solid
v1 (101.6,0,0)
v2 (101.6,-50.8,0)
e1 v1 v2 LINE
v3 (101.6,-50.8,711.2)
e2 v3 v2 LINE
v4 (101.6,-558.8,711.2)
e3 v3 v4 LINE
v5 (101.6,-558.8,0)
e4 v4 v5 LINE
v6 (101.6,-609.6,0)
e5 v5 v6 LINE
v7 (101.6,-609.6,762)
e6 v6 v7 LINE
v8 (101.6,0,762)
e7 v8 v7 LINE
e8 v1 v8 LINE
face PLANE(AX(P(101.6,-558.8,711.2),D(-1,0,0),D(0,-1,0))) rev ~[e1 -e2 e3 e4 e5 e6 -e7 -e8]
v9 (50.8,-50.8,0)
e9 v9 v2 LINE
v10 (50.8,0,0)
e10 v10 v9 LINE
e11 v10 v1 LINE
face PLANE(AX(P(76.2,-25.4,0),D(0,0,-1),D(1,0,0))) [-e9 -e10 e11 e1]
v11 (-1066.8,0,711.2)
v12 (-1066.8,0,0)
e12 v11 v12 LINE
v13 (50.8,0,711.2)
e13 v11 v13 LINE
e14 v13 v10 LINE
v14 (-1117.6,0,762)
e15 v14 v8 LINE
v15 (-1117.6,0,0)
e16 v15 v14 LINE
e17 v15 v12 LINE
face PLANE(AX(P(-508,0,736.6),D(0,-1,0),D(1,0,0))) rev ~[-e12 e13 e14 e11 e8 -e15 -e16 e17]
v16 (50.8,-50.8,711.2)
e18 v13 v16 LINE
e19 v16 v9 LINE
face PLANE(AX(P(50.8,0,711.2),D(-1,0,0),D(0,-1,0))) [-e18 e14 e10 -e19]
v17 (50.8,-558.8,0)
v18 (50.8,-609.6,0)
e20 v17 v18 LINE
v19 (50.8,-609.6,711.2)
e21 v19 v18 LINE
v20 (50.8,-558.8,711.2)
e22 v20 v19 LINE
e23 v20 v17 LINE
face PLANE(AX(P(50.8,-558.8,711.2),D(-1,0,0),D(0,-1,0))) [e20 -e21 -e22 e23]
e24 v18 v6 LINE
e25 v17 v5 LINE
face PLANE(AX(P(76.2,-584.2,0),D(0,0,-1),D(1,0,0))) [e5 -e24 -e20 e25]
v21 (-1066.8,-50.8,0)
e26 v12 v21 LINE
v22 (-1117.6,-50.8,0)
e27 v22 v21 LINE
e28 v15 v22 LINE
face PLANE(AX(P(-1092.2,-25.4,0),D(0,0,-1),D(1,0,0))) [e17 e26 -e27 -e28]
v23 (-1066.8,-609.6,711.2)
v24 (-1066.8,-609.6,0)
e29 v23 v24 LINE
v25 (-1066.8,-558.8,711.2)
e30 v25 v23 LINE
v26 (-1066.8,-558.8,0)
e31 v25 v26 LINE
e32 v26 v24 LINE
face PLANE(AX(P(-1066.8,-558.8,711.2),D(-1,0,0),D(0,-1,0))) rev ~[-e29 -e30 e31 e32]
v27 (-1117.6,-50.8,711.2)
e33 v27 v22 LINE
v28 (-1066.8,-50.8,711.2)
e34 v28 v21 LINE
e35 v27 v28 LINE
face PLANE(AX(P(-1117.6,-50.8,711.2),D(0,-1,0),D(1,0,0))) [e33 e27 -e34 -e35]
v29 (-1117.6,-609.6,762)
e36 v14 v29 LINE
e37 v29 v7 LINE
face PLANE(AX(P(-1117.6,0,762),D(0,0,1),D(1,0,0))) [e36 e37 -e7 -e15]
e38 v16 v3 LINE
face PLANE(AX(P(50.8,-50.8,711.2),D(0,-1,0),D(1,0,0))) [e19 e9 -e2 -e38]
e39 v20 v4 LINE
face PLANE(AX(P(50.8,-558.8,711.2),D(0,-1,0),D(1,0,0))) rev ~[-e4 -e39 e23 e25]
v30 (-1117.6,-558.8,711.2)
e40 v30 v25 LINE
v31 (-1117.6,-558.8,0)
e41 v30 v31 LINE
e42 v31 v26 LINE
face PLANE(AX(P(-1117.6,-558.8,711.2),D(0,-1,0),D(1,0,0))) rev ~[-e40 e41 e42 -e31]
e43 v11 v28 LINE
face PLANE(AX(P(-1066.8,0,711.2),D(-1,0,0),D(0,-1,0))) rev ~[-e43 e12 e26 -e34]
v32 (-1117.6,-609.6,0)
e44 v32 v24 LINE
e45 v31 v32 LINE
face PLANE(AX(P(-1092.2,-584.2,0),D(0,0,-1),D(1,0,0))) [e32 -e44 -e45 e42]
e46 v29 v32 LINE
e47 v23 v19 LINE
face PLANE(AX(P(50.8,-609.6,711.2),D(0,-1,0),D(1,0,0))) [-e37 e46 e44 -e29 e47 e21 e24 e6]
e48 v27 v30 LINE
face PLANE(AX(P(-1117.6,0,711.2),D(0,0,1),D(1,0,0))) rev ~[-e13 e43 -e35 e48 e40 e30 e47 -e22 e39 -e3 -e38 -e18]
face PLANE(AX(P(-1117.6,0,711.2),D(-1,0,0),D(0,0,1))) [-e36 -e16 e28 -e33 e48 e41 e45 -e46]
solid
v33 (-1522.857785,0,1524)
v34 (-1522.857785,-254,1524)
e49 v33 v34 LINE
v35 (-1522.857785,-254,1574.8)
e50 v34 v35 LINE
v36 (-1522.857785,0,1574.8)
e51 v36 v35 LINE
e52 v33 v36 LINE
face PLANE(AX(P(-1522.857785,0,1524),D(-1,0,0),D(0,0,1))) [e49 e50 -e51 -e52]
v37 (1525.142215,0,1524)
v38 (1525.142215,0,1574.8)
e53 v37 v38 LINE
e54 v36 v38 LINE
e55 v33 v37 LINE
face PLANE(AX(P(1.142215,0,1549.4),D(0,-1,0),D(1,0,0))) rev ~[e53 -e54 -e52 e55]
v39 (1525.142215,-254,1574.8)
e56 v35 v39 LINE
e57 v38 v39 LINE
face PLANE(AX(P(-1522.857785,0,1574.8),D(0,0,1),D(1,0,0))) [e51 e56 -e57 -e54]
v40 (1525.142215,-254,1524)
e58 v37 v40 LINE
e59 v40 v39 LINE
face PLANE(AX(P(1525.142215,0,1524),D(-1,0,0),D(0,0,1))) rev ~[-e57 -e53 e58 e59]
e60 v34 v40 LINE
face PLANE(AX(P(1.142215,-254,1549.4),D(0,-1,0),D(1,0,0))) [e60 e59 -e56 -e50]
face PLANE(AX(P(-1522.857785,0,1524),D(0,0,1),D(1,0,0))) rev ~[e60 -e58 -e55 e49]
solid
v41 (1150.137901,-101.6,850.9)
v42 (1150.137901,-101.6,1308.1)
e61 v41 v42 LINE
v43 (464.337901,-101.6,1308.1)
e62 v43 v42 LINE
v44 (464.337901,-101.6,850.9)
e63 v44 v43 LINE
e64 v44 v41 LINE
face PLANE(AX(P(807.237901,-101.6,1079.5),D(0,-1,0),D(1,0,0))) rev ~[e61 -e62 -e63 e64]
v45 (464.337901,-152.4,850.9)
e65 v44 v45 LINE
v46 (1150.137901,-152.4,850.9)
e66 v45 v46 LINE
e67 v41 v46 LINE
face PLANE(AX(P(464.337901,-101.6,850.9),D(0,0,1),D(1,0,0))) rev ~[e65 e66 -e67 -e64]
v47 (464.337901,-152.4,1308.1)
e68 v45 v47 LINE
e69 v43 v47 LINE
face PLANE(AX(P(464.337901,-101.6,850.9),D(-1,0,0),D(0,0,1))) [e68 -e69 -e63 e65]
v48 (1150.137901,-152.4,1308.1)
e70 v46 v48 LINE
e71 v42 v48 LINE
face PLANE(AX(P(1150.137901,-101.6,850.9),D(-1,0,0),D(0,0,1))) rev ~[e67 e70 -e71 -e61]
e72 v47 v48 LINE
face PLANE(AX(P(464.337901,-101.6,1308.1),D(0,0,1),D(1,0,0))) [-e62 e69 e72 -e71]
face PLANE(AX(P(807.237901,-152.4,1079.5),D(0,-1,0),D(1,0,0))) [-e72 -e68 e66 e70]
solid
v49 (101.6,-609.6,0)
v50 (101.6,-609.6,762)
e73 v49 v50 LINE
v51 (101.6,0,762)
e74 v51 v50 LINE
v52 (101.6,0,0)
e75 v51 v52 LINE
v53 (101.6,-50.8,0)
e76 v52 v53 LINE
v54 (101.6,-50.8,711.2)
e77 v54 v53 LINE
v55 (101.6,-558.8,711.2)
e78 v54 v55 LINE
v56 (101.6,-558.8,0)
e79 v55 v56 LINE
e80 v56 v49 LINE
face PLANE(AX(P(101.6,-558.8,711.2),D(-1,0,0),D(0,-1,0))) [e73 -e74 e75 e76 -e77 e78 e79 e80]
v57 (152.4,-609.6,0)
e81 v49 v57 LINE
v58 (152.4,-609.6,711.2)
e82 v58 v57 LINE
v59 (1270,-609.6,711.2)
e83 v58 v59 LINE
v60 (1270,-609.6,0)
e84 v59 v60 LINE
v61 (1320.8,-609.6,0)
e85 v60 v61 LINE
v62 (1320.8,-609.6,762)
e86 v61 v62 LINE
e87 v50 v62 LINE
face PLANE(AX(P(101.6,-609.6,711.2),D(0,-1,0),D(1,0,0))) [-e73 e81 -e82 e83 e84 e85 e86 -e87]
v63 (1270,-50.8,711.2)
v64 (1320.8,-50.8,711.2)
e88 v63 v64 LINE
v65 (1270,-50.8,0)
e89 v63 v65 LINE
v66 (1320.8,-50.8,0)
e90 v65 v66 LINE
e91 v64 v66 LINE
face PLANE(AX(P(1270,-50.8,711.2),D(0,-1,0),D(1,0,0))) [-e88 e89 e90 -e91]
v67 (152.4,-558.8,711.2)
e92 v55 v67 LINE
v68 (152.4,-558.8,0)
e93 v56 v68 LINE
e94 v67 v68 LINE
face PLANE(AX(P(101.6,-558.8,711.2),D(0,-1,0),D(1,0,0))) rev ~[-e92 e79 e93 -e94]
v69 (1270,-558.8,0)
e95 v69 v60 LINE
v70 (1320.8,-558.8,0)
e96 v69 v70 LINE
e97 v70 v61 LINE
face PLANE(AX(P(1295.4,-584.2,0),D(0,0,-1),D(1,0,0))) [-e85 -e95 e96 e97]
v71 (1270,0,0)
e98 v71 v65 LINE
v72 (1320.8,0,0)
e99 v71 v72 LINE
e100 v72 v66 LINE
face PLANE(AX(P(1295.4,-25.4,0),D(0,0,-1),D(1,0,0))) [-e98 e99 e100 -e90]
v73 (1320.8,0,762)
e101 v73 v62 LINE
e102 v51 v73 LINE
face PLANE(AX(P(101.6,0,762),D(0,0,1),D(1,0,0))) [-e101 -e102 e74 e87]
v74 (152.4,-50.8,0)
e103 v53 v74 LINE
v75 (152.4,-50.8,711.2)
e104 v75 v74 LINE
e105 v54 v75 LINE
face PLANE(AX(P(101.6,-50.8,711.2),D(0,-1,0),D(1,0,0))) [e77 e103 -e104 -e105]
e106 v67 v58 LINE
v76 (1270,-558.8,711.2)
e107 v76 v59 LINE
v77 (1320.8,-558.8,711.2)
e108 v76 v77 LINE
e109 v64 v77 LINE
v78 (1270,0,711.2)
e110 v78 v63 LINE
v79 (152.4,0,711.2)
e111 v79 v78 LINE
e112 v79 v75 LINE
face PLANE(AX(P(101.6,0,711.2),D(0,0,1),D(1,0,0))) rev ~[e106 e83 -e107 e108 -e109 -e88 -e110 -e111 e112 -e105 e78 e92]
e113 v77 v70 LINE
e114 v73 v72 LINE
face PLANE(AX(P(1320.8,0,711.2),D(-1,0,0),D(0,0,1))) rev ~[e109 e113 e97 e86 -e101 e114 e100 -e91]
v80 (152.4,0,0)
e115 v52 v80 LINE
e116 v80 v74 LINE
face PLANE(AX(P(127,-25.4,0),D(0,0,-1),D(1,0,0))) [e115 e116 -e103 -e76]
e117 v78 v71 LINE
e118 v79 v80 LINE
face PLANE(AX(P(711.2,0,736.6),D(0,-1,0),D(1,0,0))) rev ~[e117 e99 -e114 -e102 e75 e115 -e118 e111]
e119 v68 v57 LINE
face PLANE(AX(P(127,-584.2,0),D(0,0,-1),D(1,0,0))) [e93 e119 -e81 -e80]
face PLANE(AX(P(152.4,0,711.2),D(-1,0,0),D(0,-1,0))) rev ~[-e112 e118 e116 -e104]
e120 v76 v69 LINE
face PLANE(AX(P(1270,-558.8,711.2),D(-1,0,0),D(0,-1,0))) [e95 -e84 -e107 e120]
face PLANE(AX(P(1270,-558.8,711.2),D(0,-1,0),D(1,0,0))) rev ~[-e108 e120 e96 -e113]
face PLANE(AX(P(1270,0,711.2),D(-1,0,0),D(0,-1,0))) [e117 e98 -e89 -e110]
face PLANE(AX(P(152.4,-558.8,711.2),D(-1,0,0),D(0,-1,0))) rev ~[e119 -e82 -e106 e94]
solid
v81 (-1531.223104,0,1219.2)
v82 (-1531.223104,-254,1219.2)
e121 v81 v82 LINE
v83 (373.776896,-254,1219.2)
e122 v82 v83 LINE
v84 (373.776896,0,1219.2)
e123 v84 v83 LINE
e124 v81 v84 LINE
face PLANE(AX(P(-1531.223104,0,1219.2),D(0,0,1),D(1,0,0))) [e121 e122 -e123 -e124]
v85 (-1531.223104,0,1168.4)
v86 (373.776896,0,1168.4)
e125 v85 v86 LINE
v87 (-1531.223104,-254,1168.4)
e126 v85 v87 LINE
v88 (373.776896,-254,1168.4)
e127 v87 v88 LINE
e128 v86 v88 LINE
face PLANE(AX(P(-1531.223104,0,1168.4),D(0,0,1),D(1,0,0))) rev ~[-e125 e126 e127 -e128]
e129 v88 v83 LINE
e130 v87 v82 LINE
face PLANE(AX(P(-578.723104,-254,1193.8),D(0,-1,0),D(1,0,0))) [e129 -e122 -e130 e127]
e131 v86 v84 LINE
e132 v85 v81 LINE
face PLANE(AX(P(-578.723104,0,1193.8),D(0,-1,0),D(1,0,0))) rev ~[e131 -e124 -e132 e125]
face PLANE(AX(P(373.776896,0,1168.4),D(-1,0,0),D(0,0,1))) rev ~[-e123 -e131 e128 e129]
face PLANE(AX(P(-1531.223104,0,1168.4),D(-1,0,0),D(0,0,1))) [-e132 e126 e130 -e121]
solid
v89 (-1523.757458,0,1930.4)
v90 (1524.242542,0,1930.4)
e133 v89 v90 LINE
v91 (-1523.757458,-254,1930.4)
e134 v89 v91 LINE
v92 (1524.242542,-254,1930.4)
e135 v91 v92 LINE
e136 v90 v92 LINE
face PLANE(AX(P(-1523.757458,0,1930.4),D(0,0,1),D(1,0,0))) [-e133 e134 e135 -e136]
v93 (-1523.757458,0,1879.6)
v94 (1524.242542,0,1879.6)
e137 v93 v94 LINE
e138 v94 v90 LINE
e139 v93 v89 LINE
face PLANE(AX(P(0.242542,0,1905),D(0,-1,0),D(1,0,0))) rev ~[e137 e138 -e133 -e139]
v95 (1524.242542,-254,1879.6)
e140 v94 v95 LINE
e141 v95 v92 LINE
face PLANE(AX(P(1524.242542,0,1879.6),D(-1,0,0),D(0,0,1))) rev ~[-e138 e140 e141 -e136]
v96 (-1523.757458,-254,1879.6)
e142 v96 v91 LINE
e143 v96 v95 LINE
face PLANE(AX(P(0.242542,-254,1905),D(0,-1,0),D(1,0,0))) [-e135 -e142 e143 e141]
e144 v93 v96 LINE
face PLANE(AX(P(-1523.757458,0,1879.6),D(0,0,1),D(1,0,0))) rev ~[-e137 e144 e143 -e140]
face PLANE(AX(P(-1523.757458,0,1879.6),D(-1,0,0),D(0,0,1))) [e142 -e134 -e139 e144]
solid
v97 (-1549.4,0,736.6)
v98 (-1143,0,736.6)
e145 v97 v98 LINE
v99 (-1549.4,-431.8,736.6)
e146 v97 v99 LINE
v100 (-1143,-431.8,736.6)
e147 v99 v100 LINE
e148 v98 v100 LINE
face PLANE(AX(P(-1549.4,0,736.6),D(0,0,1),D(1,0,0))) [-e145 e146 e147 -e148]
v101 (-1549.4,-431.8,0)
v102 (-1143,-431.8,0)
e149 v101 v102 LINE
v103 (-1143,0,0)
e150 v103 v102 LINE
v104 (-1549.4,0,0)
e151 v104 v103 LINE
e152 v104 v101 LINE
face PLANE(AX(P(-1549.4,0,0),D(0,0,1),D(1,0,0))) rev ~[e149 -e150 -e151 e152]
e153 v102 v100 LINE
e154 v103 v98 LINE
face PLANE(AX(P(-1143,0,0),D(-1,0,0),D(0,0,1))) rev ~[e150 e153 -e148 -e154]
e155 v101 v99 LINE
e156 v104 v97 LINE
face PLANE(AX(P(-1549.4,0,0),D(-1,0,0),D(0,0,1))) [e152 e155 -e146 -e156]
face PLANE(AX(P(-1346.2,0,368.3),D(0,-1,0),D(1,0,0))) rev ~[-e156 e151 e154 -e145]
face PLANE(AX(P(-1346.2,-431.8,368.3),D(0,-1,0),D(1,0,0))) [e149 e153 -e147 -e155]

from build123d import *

# Parameters (mm, degrees)
F0_W     = 3048
F0_H     = 50.8
F1_DEPTH = 254
F0_W_2   = 1905
F0_W_3   = 1219.2
F2_DEPTH = 609.6
F3_START = 101.6
F0_W_4   = 685.8
F0_H_2   = 457.2
F3_DEPTH = 50.8
F4_DEPTH = 609.6
F5_W     = 50.8
F5_H     = 50.8
F6_DEPTH = 711.2
F7_DEPTH = 711.2
F0_W_5   = 406.4
F0_H_3   = 736.6
F8_DEPTH = 431.8


with BuildPart() as f1:
    # F0 (on Front) → F1 (new body)
    with BuildSketch(Plane.XZ):
        with Locations((0.2425422668, 1905)):
            Rectangle(F0_W, F0_H)
    extrude(amount=F1_DEPTH)


with BuildPart() as f1b:
    # F0 (on Front) → F1, piece 2 (new body)
    with BuildSketch(Plane.XZ):
        with Locations((1.1422147751, 1549.4)):
            Rectangle(F0_W, F0_H)
    extrude(amount=F1_DEPTH)


with BuildPart() as f1c:
    # F0 (on Front) → F1, piece 3 (new body)
    with BuildSketch(Plane.XZ):
        with Locations((-578.7231035233, 1193.8)):
            Rectangle(F0_W_2, F0_H)
    extrude(amount=F1_DEPTH)


with BuildPart() as f2:
    # F0 (on Front) → F2 (new body)
    with BuildSketch(Plane.XZ):
        with Locations((-508, 736.6)):
            Rectangle(F0_W_3, F0_H)
    extrude(amount=F2_DEPTH)

    # F5 (on face) → F6 (join)
    with BuildSketch(Plane(origin=(0, 0, 711.2), x_dir=(1, 0, 0), z_dir=(0, 0, -1))):
        with Locations((76.2, 584.2)):
            Rectangle(F5_W, F5_H)
        with Locations((-1092.2, 584.2)):
            Rectangle(F5_W, F5_H)
        with Locations((-1092.2, 25.4)):
            Rectangle(F5_W, F5_H)
        with Locations((76.2, 25.4)):
            Rectangle(F5_W, F5_H)
    extrude(amount=F6_DEPTH)


with BuildPart() as f3:
    # F0 (on Front) → F3 (new body)
    with BuildSketch(Plane.XZ.offset(F3_START)):
        with Locations((807.2379013062, 1079.5)):
            Rectangle(F0_W_4, F0_H_2)
    extrude(amount=F3_DEPTH)


with BuildPart() as f4:
    # F0 (on Front) → F4 (new body)
    with BuildSketch(Plane.XZ):
        with Locations((711.2, 736.6)):
            Rectangle(F0_W_3, F0_H)
    extrude(amount=F4_DEPTH)

    # F5 (on face) → F7 (join)
    with BuildSketch(Plane(origin=(0, 0, 711.2), x_dir=(1, 0, 0), z_dir=(0, 0, -1))):
        with Locations((127, 584.2)):
            Rectangle(F5_W, F5_H)
        with Locations((127, 25.4)):
            Rectangle(F5_W, F5_H)
        with Locations((1295.4, 584.2)):
            Rectangle(F5_W, F5_H)
        with Locations((1295.4, 25.4)):
            Rectangle(F5_W, F5_H)
    extrude(amount=F7_DEPTH)


with BuildPart() as f8:
    # F0 (on Front) → F8 (new body)
    with BuildSketch(Plane.XZ):
        with Locations((-1346.2, 368.3)):
            Rectangle(F0_W_5, F0_H_3)
    extrude(amount=F8_DEPTH)


solid = Compound([f1.part, f1b.part, f1c.part, f2.part, f3.part, f4.part, f8.part])
